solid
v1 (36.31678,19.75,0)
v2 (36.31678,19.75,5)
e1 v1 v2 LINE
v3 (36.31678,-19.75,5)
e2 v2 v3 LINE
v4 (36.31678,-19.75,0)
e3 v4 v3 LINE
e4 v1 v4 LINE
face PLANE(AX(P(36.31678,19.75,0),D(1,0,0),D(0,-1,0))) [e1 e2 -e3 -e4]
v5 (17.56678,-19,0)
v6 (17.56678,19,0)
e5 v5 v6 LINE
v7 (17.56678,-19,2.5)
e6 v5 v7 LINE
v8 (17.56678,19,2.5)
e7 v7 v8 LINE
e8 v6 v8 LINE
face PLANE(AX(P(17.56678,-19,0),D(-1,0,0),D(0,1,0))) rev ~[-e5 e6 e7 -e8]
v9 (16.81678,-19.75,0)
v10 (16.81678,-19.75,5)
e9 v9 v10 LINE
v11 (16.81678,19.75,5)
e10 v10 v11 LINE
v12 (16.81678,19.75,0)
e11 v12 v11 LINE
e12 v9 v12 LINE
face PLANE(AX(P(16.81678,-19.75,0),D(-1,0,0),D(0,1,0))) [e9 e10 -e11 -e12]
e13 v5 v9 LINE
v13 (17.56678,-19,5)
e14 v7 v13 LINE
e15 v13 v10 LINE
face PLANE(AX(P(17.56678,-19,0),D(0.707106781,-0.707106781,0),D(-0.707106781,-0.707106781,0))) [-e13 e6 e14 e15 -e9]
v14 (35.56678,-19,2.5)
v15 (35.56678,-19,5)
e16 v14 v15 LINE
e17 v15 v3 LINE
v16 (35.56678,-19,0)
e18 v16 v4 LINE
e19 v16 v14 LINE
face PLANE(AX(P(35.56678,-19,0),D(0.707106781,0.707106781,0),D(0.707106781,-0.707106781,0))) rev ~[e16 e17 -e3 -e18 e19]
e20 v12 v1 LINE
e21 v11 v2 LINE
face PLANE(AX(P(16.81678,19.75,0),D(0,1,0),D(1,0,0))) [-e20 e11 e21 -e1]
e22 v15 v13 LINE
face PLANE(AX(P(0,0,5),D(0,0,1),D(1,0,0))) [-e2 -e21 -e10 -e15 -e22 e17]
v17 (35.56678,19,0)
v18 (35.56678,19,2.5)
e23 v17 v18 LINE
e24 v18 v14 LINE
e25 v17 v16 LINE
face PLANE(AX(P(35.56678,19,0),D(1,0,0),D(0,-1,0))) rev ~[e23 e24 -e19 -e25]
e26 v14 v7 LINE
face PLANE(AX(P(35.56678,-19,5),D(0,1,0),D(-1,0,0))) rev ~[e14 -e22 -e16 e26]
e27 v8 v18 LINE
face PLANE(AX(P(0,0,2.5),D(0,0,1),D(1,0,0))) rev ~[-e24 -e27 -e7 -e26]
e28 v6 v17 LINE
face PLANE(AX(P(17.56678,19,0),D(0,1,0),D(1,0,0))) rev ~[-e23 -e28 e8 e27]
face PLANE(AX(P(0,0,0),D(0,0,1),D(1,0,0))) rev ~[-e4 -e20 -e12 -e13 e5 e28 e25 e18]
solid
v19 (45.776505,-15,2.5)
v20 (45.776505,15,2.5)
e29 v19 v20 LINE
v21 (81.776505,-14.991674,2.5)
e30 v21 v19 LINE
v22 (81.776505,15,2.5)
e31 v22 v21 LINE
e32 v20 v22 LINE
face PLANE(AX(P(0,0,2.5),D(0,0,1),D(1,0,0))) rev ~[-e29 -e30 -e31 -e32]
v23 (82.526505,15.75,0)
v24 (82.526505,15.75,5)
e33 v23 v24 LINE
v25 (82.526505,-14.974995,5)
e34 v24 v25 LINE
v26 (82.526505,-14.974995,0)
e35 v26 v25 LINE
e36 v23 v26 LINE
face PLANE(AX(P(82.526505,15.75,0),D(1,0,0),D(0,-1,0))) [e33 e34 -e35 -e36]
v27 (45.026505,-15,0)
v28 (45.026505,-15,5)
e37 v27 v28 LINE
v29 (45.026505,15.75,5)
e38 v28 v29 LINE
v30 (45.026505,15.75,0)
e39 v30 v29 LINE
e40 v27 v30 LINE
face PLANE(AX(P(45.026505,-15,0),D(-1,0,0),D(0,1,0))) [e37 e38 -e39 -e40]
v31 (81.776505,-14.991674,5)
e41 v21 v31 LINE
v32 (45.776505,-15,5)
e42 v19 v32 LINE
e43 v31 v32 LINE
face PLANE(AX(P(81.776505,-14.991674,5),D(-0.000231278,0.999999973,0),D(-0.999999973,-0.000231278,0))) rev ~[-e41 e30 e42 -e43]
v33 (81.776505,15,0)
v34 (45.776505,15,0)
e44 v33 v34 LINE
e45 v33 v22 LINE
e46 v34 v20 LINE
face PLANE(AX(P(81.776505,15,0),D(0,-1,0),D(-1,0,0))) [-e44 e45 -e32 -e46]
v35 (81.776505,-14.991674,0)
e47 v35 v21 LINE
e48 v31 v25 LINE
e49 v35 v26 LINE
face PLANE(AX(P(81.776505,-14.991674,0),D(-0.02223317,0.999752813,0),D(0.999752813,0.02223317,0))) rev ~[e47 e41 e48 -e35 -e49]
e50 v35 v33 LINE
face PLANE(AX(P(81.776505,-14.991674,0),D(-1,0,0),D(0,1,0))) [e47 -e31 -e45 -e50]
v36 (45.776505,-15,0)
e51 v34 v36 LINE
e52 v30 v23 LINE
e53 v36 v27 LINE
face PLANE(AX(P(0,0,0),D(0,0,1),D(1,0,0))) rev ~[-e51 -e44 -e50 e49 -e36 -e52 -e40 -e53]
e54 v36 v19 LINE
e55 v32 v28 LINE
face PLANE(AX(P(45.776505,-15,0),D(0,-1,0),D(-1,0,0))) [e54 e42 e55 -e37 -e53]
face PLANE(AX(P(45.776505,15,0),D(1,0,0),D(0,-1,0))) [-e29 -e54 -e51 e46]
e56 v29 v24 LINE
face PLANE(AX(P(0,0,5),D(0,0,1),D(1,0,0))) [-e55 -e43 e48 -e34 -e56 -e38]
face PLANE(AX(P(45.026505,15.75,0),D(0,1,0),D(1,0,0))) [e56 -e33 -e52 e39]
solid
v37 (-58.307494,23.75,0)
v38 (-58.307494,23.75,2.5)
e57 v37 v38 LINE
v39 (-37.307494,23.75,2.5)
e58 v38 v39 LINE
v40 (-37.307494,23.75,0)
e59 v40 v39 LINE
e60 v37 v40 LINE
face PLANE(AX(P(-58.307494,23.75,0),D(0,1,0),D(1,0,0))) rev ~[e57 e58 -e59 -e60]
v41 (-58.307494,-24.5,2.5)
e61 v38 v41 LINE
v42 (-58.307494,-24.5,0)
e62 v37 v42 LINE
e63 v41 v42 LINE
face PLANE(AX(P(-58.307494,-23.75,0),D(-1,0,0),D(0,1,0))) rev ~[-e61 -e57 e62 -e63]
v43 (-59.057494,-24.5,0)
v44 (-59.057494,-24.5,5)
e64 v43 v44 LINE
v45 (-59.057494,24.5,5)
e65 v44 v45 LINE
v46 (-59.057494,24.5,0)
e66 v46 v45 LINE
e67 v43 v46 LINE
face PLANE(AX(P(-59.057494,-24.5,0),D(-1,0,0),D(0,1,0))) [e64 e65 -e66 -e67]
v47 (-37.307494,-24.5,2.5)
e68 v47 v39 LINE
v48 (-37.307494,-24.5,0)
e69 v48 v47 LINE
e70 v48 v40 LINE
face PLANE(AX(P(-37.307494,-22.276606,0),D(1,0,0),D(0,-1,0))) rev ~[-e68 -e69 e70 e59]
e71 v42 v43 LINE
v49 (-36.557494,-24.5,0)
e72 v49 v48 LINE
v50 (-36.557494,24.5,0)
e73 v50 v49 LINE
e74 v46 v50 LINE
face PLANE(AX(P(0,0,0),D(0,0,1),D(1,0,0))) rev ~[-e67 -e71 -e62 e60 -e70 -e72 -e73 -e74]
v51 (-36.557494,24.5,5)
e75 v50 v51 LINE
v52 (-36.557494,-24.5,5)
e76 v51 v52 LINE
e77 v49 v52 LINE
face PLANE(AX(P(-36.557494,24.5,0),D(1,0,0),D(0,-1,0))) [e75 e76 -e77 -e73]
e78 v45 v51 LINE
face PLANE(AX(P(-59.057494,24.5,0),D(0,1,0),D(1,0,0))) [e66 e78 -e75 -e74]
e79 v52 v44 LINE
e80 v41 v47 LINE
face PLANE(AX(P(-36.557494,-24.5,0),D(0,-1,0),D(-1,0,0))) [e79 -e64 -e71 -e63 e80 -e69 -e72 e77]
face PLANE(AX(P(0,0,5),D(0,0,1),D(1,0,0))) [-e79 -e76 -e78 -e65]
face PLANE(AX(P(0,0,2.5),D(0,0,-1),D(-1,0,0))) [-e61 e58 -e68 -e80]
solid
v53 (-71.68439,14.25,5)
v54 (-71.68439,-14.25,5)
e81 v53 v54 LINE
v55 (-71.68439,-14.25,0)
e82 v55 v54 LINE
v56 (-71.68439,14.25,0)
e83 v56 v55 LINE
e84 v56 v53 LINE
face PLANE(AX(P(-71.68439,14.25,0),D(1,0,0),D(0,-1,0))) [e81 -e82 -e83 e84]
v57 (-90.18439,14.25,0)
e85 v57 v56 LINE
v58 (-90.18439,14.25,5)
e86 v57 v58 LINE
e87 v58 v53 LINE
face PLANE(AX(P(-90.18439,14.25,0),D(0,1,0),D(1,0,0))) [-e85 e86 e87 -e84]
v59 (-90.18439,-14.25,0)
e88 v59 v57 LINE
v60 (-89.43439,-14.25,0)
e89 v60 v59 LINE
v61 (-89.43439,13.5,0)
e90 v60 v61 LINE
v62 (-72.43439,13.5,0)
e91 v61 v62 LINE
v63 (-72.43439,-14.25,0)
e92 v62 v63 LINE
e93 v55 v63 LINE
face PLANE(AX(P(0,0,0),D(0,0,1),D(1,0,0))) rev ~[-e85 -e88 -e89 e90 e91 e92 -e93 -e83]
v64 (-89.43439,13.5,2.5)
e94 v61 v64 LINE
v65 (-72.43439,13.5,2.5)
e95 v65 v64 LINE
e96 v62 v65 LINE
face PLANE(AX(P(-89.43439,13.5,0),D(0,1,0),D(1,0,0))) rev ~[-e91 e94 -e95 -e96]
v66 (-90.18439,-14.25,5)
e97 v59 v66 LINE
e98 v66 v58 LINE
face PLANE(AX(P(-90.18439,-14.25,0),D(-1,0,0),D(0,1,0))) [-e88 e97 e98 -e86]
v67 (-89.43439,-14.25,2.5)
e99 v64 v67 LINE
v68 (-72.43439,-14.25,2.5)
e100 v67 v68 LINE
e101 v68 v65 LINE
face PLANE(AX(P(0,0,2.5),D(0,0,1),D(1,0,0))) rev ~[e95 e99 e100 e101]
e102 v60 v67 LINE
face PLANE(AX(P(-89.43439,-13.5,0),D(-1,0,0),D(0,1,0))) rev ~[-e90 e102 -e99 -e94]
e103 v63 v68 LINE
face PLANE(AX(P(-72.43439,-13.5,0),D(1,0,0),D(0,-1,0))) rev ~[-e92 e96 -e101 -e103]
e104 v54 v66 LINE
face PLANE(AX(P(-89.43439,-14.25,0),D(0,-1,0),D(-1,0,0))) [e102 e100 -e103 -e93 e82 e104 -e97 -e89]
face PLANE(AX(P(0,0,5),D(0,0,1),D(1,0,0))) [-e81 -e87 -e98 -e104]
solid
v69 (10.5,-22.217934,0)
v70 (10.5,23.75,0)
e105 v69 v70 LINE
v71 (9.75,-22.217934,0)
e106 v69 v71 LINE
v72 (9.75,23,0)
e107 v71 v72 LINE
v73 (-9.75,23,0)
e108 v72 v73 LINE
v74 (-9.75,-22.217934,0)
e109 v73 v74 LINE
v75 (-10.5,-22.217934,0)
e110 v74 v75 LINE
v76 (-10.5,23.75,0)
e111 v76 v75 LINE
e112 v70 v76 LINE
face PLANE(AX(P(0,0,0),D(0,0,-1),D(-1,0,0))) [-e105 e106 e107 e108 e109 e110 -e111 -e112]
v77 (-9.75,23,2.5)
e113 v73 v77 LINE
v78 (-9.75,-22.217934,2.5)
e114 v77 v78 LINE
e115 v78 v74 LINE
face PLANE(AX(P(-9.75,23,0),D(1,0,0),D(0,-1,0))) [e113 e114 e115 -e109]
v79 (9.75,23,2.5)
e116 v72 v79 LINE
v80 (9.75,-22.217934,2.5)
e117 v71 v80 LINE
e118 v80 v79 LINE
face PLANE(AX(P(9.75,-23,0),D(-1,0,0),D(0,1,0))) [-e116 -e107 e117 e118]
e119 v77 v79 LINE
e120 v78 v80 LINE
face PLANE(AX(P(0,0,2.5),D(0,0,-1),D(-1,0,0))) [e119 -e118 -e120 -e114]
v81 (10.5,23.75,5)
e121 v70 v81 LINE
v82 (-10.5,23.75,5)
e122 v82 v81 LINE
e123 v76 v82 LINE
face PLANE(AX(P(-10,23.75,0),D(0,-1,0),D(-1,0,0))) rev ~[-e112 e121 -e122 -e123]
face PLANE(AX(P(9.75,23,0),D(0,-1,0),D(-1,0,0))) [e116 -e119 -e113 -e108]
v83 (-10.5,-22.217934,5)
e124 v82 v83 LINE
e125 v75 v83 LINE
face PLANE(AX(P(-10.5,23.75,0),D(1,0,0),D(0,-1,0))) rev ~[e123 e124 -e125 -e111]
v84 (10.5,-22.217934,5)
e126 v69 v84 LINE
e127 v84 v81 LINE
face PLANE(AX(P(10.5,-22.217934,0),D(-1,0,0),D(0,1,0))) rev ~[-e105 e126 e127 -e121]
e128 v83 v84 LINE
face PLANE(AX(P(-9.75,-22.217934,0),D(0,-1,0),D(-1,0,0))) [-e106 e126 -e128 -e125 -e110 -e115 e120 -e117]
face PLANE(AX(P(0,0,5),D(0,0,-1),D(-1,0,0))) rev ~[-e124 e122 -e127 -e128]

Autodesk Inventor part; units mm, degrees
ref_plane "YZ Plane" through (0, 0, 0) normal (1, 0, 0) x (0, 1, 0)
ref_plane "XZ Plane" through (0, 0, 0) normal (0, 1, 0) x (-1, 0, 0)
ref_plane "XY Plane" through (0, 0, 0) normal (0, 0, 1) x (1, 0, 0)
sketch "Sketch1" plane through (0, 0, 0) normal (0, 0, 1) x (1, 0, 0)
  point P0 (0, 0)
sketch "Sketch2" plane through (0, 0, 0) normal (0, 0, 1) x (1, 0, 0)
  line L0 (-9.25, -22.217934) -> (-9.25, 23)
  line L1 (-9.25, 23) -> (9.25, 23)
  line L2 (9.25, -23) -> (-9.25, 23) construction
  line L3 (-9.25, -23) -> (9.25, 23) construction
  line L4 (-10, 23.75) -> (10, 23.75)
  line L5 (10, 23.75) -> (10, -22.217934)
  line L6 (-10, -22.217934) -> (-10, 23.75)
  line L7 (-10, 23.75) -> (10, -23.75) construction
  line L8 (10, 23.75) -> (-10, -23.75) construction
  line L9 (-58.307494, 23.75) -> (-37.307494, 23.75)
  line L10 (-37.307494, 23.75) -> (-37.307494, -23.75)
  line L11 (-37.307494, -23.75) -> (-58.307494, -23.75)
  line L12 (-58.307494, -23.75) -> (-58.307494, 23.75)
  line L13 (-58.307494, 23.75) -> (-37.307494, -23.75) construction
  line L14 (-37.307494, 23.75) -> (-58.307494, -23.75) construction
  line L15 (-59.057494, 24.5) -> (-36.557494, 24.5)
  line L16 (-36.557494, 24.5) -> (-36.557494, -24.5)
  line L17 (-36.557494, -24.5) -> (-59.057494, -24.5)
  line L18 (-59.057494, -24.5) -> (-59.057494, 24.5)
  line L19 (-59.057494, 24.5) -> (-36.557494, -24.5) construction
  line L20 (-36.557494, 24.5) -> (-59.057494, -24.5) construction
  line L21 (-89.43439, 13.5) -> (-72.43439, 13.5)
  line L22 (-72.43439, 13.5) -> (-72.43439, -13.5)
  line L23 (-72.43439, -13.5) -> (-89.43439, -13.5)
  line L24 (-89.43439, -13.5) -> (-89.43439, 13.5)
  line L25 (-89.43439, 13.5) -> (-72.43439, -13.5) construction
  line L26 (-72.43439, 13.5) -> (-89.43439, -13.5) construction
  line L27 (-90.18439, -14.25) -> (-90.18439, 14.25)
  line L28 (-90.18439, 14.25) -> (-71.68439, 14.25)
  line L29 (-71.68439, 14.25) -> (-71.68439, -14.25)
  line L30 (-71.68439, -14.25) -> (-90.18439, 14.25) construction
  line L31 (-90.18439, -14.25) -> (-71.68439, 14.25) construction
  line L32 (17.56678, 19) -> (35.56678, 19)
  line L33 (35.56678, 19) -> (35.56678, -19)
  line L34 (35.56678, -19) -> (17.56678, -19)
  line L35 (17.56678, -19) -> (17.56678, 19)
  line L36 (17.56678, 19) -> (35.56678, -19) construction
  line L37 (35.56678, 19) -> (17.56678, -19) construction
  line L38 (16.81678, -19.75) -> (16.81678, 19.75)
  line L39 (16.81678, 19.75) -> (36.31678, 19.75)
  line L40 (36.31678, 19.75) -> (36.31678, -19.75)
  line L41 (36.31678, -19.75) -> (16.81678, 19.75) construction
  line L42 (16.81678, -19.75) -> (36.31678, 19.75) construction
  line L43 (81.776505, -14.991674) -> (81.776505, 15)
  line L44 (81.776505, 15) -> (45.776505, 15)
  line L45 (45.776505, 15) -> (45.776505, -15)
  line L46 (45.776505, -15) -> (81.776505, 15) construction
  line L47 (81.776505, -14.991674) -> (45.776505, 15) construction
  line L48 (45.026505, 15.75) -> (82.526505, 15.75)
  line L49 (82.526505, 15.75) -> (82.526505, -14.974995)
  line L50 (45.026505, -15) -> (45.026505, 15.75)
  line L51 (45.026505, 15.75) -> (82.09375, -15.378222) construction
  line L52 (82.526505, 15.75) -> (63.776505, 0) construction
  line L53 (46.395553, -15) -> (45.526505, -15.75) construction
  line L54 (81.776505, -14.991674) -> (82.526505, -14.974995)
  line L55 (45.776505, -15) -> (45.026505, -15)
  line L56 (-9.25, -23.75) -> (-9.55163, -23.75)
  line L57 (-10, -22.217934) -> (-9.25, -22.217934)
  line L58 (9.25, -22.217934) -> (10, -22.217934)
  line L59 (9.25, 23) -> (9.25, 21.96875)
  line L60 (9.25, -21.96875) -> (9.25, -22.217934)
  line L61 (9.25, -21.96875) -> (9.25, 23)
  line L62 (-89.43439, -13.5) -> (-89.43439, -14.25)
  line L63 (-72.43439, -13.5) -> (-72.43439, -14.25)
  line L64 (-71.68439, -14.25) -> (-72.43439, -14.25)
  line L65 (-89.43439, -14.25) -> (-90.18439, -14.25)
  line L66 (0, 0) -> (0, -5.712725)
  line L67 (17.56678, -19) -> (16.81678, -19.75)
  line L68 (35.56678, -19) -> (36.31678, -19.75)
  line L69 (36.31678, -19.75) -> (35.56678, -19.75)
  line L70 (17.56678, -19.75) -> (16.81678, -19.75)
  line L71 (63.776505, 0) -> (63.776505, -4.283489)
  point P0 (-47.807494, 0)
  point P1 (-47.807494, 0)
  point P2 (-80.93439, 0)
  point P3 (-80.93439, 0)
  point P4 (26.56678, 0)
  point P5 (63.779004, 0.002082)
  dimension "d0" = 18.5
  dimension "d3" = 47.5
  dimension "d4" = 21
  dimension "d5" = 47.5
  dimension "d6" = 22.5
  dimension "d7" = 49
  dimension "d8" = 17
  dimension "d9" = 27
  dimension "d10" = 18.5
  dimension "d11" = 28.5
  dimension "d12" = 18
  dimension "d13" = 38
  dimension "d14" = 19.5
  dimension "d15" = 39.5
  dimension "d16" = 36
  dimension "d24" = 20
  dimension "d25" = 37.5
extrude "Extrusion1" add sketch "Sketch2" along normal blind 5 contours L57 L6 L4 L5 L58 L60 L61 L59 L1 L0 | L15 L16 L17 L18 | L24 L62 L65 L27 L28 L29 L64 L63 L22 L21 | L35 L67 L38 L39 L40 L68 L33 L32 | L43 L44 L45 L55 L50 L48 L49 L54
sketch "Sketch3" plane through (0, 0, 5) normal (0, 0, 1) x (1, 0, 0)
  line L0 (-9.25, -22.217934) -> (-9.25, 23)
  line L1 (-9.25, 23) -> (9.25, 23)
  line L2 (9.25, 23) -> (9.25, -22.217934)
  line L3 (17.56678, -19) -> (17.56678, 19)
  line L4 (17.56678, 19) -> (35.56678, 19)
  line L5 (35.56678, 19) -> (35.56678, -19)
  line L6 (35.56678, -19) -> (17.56678, -19)
  line L7 (45.776505, -15) -> (45.776505, 15)
  line L8 (45.776505, 15) -> (81.776505, 15)
  line L9 (81.776505, 15) -> (81.776505, -14.991674)
  line L10 (-58.307494, 23.75) -> (-37.307494, 23.75)
  line L11 (-58.307494, -23.75) -> (-58.307494, 23.75)
  line L12 (-37.307494, 23.75) -> (-37.307494, -23.75)
  line L13 (-37.307494, -23.75) -> (-58.307494, -23.75)
  line L14 (-72.43439, 13.5) -> (-72.43439, -14.25)
  line L15 (-89.43439, 13.5) -> (-72.43439, 13.5)
  line L16 (-89.43439, -14.25) -> (-89.43439, 13.5)
  line L17 (9.25, -22.217934) -> (-9.25, -22.217934)
  line L18 (81.776505, -15) -> (45.776505, -15)
  line L19 (-71.68439, -14.25) -> (-71.68439, 14.25)
  line L20 (-89.43439, -14.25) -> (-71.68439, -14.25)
  line L21 (-71.68439, -14.25) -> (-71.68439, 14.25)
  line L22 (-71.68439, 14.25) -> (-90.18439, 14.25)
  line L23 (-90.18439, 14.25) -> (-90.18439, -14.25)
  line L24 (-90.18439, 14.25) -> (-90.18439, -14.25)
  line L25 (-89.43439, -14.25) -> (-89.43439, 13.5)
  line L26 (-90.18439, -14.25) -> (-89.43439, -14.25)
  line L27 (-89.43439, -14.25) -> (-72.43439, -14.25)
  point P0 (0, 0)
  point P1 (-72.43439, -12.5)
  point P2 (-89.43439, -12.5)
sketch "Sketch3 outline for Extrusion2" plane through (0, 0, 5) normal (0, 0, 1) x (1, 0, 0)
  line L0 (-72.43439, 13.5) -> (-89.43439, 13.5)
  line L1 (-89.43439, 13.5) -> (-89.43439, -14.25)
  line L2 (-89.43439, -14.25) -> (-72.43439, -14.25)
  line L3 (-72.43439, -14.25) -> (-72.43439, 13.5)
  line L4 (17.56678, -19) -> (17.56678, 19)
  line L5 (17.56678, 19) -> (35.56678, 19)
  line L6 (35.56678, 19) -> (35.56678, -19)
  line L7 (35.56678, -19) -> (17.56678, -19)
  line L8 (-58.307494, 23.75) -> (-37.307494, 23.75)
  line L9 (-37.307494, 23.75) -> (-37.307494, -23.75)
  line L10 (-37.307494, -23.75) -> (-58.307494, -23.75)
  line L11 (-58.307494, -23.75) -> (-58.307494, 23.75)
  line L12 (-9.25, -22.217934) -> (-9.25, 23)
  line L13 (-9.25, 23) -> (9.25, 23)
  line L14 (9.25, 23) -> (9.25, -22.217934)
  line L15 (9.25, -22.217934) -> (-9.25, -22.217934)
  line L16 (45.776505, -15) -> (45.776505, 15)
  line L17 (45.776505, 15) -> (81.776505, 15)
  line L18 (81.776505, 15) -> (81.776505, -14.991674)
  line L19 (81.776505, -14.991674) -> (45.776505, -15)
extrude "Extrusion2" add sketch "Sketch3 outline for Extrusion2" against normal blind 2.5
sketch "Sketch4" plane through (0, 0, 0) normal (0, 0, -1) x (-1, 0, 0)
  line L0 (-9.25, -22.217934) -> (9.25, -22.217934)
  line L1 (-9.25, 23) -> (9.25, 23)
  line L2 (9.75, -23) -> (-9.75, -23)
  line L3 (-9.75, -23) -> (-9.75, 23)
  line L4 (-9.75, 23) -> (9.75, 23)
  line L5 (9.75, 23) -> (9.75, -23)
  line L6 (9.75, -23) -> (-9.75, 23) construction
  line L7 (-9.75, -23) -> (9.75, 23) construction
  point P0 (0, 0)
  dimension "d26" = 19.5
extrude "Extrusion3" cut sketch "Sketch4" against normal up to surface (2.5 mm away)
sketch "Sketch5" plane through (0, 0, 0) normal (0, 0, -1) x (-1, 0, 0)
  line L0 (10, 23.75) -> (-10, 23.75)
  line L1 (-10.5, -22.217934) -> (-10.5, 23.75)
  line L2 (-10.5, 23.75) -> (10.5, 23.75)
  line L3 (10.5, 23.75) -> (10.5, -22.217934)
  line L4 (10.5, -23.75) -> (-10.5, 23.75) construction
  line L5 (-10.5, -23.75) -> (10.5, 23.75) construction
  line L6 (-9.75, -22.217934) -> (-9.75, 23)
  line L7 (9.75, 23) -> (9.75, -22.217934)
  line L8 (-9.75, 23) -> (9.75, 23)
  line L9 (9.75, -22.217934) -> (-9.75, -22.217934)
  line L10 (9.75, -22.217934) -> (10.5, -22.217934)
  line L11 (-9.75, -22.217934) -> (-10.5, -22.217934)
  line L12 (10.5, -23.75) -> (9.75, -23.75)
  line L13 (-9.75, -23.75) -> (-10.5, -23.75)
  point P0 (0, 0)
  dimension "d29" = 21
extrude "Extrusion4" add sketch "Sketch5" against normal up to surface (5 mm away) contours L2 L3 L10 L7 L8 L6 L11 L1 L0
sketch "Sketch6" plane through (0, 0, 0) normal (0, 0, -1) x (-1, 0, 0)
  line L0 (58.307494, 23.75) -> (58.307494, -23.75)
  line L1 (58.307494, -22.276606) -> (37.307494, -22.276606)
  line L2 (37.307494, -22.276606) -> (37.307494, -28.128935)
  line L3 (37.307494, -28.128935) -> (58.307494, -28.128935)
  line L4 (58.307494, -28.128935) -> (58.307494, -22.276606)
  point P0 (0, 0)
extrude "Extrusion5" cut sketch "Sketch6" against normal up to surface (2.5 mm away)
properties part number "CIRCUIT MOUNT"
